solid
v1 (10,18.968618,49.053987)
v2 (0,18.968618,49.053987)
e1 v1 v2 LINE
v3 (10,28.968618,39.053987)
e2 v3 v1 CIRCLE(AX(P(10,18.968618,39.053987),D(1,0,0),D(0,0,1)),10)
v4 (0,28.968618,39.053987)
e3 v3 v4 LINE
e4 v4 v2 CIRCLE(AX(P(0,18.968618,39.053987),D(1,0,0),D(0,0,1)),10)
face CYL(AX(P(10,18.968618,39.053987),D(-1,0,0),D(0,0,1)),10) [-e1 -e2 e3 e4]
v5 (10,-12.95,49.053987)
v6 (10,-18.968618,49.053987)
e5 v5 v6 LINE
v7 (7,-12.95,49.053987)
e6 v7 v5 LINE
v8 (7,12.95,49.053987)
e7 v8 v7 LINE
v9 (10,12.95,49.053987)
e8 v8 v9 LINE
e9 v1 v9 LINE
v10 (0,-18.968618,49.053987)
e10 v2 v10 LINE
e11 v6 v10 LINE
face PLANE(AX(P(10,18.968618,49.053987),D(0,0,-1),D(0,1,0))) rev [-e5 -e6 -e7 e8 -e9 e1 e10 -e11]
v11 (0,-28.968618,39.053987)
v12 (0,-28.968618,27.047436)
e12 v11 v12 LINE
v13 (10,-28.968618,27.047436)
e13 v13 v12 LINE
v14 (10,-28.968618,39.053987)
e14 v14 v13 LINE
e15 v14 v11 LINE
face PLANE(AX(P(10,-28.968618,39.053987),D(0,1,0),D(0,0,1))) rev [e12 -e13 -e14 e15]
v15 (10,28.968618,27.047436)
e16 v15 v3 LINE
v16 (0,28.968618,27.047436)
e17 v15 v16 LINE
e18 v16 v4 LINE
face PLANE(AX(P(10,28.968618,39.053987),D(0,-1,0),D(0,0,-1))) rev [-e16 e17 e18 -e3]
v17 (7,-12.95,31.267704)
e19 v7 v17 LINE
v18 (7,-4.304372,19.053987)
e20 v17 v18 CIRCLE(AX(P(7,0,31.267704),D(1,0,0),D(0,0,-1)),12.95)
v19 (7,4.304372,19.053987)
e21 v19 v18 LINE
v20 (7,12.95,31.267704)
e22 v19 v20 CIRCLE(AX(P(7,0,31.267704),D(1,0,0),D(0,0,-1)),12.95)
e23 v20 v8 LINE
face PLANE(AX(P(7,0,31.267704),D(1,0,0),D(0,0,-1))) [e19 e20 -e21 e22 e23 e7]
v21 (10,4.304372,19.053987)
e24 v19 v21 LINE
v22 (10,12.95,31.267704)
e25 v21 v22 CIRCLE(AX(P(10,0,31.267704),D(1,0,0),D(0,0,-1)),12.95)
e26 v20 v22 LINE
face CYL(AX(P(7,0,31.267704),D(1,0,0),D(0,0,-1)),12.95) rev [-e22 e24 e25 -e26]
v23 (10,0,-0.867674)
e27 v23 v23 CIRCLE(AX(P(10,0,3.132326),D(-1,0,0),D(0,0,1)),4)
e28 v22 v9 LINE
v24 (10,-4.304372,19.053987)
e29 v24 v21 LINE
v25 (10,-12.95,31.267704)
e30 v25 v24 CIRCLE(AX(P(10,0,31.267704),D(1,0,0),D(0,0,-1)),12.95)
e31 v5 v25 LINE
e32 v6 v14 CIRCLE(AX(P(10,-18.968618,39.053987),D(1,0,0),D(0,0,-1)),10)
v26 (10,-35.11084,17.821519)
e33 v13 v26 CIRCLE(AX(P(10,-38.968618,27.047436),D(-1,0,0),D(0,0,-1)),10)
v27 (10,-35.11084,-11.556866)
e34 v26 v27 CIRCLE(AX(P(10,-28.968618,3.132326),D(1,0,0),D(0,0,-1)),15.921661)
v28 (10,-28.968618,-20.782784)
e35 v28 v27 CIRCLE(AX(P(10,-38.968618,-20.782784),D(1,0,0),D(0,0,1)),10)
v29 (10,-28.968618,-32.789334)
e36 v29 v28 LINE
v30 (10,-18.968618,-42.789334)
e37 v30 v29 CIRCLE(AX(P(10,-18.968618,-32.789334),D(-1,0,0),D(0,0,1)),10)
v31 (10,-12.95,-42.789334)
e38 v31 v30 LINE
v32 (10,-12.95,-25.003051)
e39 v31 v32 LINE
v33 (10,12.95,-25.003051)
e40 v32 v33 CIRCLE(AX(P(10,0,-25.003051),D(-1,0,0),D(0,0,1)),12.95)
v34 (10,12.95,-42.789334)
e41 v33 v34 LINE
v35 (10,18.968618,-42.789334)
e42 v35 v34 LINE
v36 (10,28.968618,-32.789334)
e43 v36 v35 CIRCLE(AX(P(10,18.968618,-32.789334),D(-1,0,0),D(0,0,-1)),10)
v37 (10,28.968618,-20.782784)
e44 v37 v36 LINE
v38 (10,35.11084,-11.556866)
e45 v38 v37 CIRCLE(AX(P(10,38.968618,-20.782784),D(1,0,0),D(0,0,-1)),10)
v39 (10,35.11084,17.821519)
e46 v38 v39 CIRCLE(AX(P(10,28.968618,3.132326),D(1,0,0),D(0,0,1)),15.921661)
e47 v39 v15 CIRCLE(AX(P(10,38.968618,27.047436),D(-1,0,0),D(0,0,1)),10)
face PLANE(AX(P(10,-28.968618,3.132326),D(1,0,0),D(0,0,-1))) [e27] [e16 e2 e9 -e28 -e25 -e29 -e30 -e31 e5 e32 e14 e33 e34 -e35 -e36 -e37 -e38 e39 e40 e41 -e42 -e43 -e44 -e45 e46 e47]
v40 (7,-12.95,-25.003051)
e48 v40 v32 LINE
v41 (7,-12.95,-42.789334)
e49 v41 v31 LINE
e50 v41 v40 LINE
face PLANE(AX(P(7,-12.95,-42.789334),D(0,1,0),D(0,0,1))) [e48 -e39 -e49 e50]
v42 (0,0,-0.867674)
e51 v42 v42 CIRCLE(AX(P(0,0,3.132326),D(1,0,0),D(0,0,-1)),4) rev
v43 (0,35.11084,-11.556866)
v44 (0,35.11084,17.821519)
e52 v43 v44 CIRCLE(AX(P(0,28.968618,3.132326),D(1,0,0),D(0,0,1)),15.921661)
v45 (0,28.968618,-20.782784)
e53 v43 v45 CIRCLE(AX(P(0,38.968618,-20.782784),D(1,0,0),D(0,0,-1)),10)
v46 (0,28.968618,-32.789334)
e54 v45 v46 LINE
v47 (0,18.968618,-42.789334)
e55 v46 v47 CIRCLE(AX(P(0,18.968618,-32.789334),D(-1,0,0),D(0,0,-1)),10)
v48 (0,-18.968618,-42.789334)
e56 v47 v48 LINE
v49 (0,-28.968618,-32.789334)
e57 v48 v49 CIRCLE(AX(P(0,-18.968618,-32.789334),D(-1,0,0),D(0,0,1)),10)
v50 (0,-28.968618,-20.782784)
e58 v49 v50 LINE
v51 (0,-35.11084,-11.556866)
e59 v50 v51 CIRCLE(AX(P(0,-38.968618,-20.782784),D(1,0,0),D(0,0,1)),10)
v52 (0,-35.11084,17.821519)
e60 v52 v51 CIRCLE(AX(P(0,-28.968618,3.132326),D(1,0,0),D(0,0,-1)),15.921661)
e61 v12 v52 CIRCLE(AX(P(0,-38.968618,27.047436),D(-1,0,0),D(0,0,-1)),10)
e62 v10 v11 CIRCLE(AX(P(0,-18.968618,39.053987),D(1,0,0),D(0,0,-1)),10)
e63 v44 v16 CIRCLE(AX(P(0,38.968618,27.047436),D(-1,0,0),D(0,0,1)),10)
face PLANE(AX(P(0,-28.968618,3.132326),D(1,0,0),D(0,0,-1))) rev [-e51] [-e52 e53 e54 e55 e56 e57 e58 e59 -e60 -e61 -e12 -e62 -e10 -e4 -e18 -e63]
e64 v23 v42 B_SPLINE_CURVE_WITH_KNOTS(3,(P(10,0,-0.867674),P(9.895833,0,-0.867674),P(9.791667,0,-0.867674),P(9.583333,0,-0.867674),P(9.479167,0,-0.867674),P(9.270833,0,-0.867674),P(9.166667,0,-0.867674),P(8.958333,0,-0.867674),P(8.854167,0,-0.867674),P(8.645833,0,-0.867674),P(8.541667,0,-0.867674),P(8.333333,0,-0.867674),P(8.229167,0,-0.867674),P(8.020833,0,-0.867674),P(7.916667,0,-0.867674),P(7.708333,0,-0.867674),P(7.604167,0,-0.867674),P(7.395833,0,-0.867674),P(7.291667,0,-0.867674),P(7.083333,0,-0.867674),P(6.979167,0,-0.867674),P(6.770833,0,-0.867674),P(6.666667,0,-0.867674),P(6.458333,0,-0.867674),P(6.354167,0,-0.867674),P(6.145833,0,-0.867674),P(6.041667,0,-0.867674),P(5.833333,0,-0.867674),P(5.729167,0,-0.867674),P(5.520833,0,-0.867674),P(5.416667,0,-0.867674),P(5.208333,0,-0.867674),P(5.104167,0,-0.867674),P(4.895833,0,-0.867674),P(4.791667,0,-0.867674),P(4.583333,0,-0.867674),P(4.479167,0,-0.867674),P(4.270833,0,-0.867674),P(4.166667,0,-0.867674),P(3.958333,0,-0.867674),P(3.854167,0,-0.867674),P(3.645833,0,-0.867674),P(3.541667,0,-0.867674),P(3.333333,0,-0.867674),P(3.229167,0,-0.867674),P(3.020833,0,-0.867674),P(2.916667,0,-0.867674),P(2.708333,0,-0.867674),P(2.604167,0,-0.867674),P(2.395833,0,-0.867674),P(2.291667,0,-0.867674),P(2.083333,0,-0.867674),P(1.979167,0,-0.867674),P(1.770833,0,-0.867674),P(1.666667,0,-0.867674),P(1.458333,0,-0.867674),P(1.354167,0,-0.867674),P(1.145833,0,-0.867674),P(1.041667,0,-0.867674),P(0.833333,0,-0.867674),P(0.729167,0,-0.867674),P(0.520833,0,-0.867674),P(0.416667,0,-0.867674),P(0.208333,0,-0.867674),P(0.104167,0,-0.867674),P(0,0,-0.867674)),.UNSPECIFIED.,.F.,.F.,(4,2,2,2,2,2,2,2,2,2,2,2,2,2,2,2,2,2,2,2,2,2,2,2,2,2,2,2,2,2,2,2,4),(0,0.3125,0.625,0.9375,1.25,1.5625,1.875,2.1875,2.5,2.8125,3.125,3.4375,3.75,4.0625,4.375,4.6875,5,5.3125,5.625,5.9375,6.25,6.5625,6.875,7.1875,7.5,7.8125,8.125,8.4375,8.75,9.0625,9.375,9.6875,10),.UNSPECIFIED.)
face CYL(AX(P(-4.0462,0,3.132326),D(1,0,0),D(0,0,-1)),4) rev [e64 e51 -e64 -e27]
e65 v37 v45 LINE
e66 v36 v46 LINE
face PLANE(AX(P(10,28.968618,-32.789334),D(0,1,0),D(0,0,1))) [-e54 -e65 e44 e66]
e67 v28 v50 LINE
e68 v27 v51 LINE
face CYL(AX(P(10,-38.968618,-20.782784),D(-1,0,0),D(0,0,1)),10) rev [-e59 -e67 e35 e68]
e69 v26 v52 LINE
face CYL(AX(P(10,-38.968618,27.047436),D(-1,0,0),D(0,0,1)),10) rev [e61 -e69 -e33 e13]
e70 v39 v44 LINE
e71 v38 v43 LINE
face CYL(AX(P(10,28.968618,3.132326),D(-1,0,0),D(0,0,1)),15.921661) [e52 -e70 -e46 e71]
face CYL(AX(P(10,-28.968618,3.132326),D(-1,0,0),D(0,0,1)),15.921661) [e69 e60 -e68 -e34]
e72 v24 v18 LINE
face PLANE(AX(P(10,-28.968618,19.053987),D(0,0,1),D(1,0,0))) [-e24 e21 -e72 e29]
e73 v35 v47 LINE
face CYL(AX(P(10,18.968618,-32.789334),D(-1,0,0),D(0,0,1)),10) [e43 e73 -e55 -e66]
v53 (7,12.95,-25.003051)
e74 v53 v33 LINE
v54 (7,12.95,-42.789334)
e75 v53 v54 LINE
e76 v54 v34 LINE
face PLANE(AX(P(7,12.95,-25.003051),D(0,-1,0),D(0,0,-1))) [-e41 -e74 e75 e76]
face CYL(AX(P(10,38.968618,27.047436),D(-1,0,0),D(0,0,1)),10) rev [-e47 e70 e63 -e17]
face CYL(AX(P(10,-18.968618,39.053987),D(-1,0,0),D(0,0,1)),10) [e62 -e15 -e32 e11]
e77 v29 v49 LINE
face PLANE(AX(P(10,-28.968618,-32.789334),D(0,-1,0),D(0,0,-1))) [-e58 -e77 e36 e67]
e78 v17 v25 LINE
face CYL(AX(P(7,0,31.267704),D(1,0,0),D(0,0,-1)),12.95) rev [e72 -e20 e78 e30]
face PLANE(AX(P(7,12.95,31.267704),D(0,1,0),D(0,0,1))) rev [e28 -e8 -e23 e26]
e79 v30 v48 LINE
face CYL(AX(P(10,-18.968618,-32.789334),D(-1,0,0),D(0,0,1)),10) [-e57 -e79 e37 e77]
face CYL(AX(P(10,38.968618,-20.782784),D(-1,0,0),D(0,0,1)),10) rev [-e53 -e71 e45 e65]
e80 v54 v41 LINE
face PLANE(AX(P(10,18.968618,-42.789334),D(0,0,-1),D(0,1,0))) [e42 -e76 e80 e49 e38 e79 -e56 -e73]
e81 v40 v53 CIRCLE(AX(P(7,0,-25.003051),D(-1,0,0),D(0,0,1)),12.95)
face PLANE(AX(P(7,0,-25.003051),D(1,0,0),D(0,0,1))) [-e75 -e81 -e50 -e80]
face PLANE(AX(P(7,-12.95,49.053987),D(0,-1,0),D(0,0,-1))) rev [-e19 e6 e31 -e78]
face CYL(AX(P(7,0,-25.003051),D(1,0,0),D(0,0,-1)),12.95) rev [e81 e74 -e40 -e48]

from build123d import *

# Parameters (mm, degrees)
BOSS_EXTRUDE3_DEPTH = 10
SKETCH3_R           = 4
CUT_EXTRUDE3_DEPTH  = 14.0462
CUT_EXTRUDE4_DEPTH  = 3


with BuildPart() as part:
    # Sketch1 → Boss-Extrude3 (new body)
    with BuildSketch(Plane.YZ):
        with BuildLine():
            Line((-28.968617751, -12.789334175), (28.968617751, -12.789334175))
            ThreePointArc((28.968617751, -12.789334175), (44.579120821, 0), (35.110840206, 17.821518929))
            ThreePointArc((35.110840206, 17.821518929), (30.644623053, 21.505675602), (28.968617751, 27.047436358))
            Line((28.968617751, 27.047436358), (28.968617751, 39.053986921))
            ThreePointArc((28.968617751, 39.053986921), (26.039685563, 46.125054733), (18.968617751, 49.053986921))
            Line((18.968617751, 49.053986921), (-18.968617751, 49.053986921))
            ThreePointArc((-18.968617751, 49.053986921), (-26.039685563, 46.125054733), (-28.968617751, 39.053986921))
            Line((-28.968617751, 39.053986921), (-28.968617751, 27.047436358))
            ThreePointArc((-28.968617751, 27.047436358), (-30.644623053, 21.505675602), (-35.110840206, 17.821518929))
            ThreePointArc((-35.110840206, 17.821518929), (-44.579120821, 0), (-28.968617751, -12.789334175))
        make_face()
    boss_extrude3 = extrude(amount=BOSS_EXTRUDE3_DEPTH)

    # Sketch3 → Cut-Extrude3 (cut)
    with BuildSketch(Plane.YZ.offset(10)):
        with Locations((0, 3.132326373)):
            Circle(SKETCH3_R)
    cut_extrude3 = extrude(amount=-CUT_EXTRUDE3_DEPTH, mode=Mode.SUBTRACT)

    # Sketch4 → Cut-Extrude4 (cut)
    with BuildSketch(Plane.YZ.offset(10)):
        with BuildLine():
            Line((-12.95, 49.053986921), (-12.95, 31.267703884))
            ThreePointArc((-12.95, 31.267703884), (0, 18.317703884), (12.95, 31.267703884))
            Line((12.95, 31.267703884), (12.95, 49.053986921))
            Line((12.95, 49.053986921), (-12.95, 49.053986921))
        make_face()
    cut_extrude4 = extrude(amount=-CUT_EXTRUDE4_DEPTH, mode=Mode.SUBTRACT)

    # Mirror1: Boss-Extrude3, Cut-Extrude3, Cut-Extrude4 across plane
    add(boss_extrude3.mirror(Plane.XY.offset(3.132326373)))
    add(cut_extrude3.mirror(Plane.XY.offset(3.132326373)), mode=Mode.SUBTRACT)
    add(cut_extrude4.mirror(Plane.XY.offset(3.132326373)), mode=Mode.SUBTRACT)


solid = part.part
